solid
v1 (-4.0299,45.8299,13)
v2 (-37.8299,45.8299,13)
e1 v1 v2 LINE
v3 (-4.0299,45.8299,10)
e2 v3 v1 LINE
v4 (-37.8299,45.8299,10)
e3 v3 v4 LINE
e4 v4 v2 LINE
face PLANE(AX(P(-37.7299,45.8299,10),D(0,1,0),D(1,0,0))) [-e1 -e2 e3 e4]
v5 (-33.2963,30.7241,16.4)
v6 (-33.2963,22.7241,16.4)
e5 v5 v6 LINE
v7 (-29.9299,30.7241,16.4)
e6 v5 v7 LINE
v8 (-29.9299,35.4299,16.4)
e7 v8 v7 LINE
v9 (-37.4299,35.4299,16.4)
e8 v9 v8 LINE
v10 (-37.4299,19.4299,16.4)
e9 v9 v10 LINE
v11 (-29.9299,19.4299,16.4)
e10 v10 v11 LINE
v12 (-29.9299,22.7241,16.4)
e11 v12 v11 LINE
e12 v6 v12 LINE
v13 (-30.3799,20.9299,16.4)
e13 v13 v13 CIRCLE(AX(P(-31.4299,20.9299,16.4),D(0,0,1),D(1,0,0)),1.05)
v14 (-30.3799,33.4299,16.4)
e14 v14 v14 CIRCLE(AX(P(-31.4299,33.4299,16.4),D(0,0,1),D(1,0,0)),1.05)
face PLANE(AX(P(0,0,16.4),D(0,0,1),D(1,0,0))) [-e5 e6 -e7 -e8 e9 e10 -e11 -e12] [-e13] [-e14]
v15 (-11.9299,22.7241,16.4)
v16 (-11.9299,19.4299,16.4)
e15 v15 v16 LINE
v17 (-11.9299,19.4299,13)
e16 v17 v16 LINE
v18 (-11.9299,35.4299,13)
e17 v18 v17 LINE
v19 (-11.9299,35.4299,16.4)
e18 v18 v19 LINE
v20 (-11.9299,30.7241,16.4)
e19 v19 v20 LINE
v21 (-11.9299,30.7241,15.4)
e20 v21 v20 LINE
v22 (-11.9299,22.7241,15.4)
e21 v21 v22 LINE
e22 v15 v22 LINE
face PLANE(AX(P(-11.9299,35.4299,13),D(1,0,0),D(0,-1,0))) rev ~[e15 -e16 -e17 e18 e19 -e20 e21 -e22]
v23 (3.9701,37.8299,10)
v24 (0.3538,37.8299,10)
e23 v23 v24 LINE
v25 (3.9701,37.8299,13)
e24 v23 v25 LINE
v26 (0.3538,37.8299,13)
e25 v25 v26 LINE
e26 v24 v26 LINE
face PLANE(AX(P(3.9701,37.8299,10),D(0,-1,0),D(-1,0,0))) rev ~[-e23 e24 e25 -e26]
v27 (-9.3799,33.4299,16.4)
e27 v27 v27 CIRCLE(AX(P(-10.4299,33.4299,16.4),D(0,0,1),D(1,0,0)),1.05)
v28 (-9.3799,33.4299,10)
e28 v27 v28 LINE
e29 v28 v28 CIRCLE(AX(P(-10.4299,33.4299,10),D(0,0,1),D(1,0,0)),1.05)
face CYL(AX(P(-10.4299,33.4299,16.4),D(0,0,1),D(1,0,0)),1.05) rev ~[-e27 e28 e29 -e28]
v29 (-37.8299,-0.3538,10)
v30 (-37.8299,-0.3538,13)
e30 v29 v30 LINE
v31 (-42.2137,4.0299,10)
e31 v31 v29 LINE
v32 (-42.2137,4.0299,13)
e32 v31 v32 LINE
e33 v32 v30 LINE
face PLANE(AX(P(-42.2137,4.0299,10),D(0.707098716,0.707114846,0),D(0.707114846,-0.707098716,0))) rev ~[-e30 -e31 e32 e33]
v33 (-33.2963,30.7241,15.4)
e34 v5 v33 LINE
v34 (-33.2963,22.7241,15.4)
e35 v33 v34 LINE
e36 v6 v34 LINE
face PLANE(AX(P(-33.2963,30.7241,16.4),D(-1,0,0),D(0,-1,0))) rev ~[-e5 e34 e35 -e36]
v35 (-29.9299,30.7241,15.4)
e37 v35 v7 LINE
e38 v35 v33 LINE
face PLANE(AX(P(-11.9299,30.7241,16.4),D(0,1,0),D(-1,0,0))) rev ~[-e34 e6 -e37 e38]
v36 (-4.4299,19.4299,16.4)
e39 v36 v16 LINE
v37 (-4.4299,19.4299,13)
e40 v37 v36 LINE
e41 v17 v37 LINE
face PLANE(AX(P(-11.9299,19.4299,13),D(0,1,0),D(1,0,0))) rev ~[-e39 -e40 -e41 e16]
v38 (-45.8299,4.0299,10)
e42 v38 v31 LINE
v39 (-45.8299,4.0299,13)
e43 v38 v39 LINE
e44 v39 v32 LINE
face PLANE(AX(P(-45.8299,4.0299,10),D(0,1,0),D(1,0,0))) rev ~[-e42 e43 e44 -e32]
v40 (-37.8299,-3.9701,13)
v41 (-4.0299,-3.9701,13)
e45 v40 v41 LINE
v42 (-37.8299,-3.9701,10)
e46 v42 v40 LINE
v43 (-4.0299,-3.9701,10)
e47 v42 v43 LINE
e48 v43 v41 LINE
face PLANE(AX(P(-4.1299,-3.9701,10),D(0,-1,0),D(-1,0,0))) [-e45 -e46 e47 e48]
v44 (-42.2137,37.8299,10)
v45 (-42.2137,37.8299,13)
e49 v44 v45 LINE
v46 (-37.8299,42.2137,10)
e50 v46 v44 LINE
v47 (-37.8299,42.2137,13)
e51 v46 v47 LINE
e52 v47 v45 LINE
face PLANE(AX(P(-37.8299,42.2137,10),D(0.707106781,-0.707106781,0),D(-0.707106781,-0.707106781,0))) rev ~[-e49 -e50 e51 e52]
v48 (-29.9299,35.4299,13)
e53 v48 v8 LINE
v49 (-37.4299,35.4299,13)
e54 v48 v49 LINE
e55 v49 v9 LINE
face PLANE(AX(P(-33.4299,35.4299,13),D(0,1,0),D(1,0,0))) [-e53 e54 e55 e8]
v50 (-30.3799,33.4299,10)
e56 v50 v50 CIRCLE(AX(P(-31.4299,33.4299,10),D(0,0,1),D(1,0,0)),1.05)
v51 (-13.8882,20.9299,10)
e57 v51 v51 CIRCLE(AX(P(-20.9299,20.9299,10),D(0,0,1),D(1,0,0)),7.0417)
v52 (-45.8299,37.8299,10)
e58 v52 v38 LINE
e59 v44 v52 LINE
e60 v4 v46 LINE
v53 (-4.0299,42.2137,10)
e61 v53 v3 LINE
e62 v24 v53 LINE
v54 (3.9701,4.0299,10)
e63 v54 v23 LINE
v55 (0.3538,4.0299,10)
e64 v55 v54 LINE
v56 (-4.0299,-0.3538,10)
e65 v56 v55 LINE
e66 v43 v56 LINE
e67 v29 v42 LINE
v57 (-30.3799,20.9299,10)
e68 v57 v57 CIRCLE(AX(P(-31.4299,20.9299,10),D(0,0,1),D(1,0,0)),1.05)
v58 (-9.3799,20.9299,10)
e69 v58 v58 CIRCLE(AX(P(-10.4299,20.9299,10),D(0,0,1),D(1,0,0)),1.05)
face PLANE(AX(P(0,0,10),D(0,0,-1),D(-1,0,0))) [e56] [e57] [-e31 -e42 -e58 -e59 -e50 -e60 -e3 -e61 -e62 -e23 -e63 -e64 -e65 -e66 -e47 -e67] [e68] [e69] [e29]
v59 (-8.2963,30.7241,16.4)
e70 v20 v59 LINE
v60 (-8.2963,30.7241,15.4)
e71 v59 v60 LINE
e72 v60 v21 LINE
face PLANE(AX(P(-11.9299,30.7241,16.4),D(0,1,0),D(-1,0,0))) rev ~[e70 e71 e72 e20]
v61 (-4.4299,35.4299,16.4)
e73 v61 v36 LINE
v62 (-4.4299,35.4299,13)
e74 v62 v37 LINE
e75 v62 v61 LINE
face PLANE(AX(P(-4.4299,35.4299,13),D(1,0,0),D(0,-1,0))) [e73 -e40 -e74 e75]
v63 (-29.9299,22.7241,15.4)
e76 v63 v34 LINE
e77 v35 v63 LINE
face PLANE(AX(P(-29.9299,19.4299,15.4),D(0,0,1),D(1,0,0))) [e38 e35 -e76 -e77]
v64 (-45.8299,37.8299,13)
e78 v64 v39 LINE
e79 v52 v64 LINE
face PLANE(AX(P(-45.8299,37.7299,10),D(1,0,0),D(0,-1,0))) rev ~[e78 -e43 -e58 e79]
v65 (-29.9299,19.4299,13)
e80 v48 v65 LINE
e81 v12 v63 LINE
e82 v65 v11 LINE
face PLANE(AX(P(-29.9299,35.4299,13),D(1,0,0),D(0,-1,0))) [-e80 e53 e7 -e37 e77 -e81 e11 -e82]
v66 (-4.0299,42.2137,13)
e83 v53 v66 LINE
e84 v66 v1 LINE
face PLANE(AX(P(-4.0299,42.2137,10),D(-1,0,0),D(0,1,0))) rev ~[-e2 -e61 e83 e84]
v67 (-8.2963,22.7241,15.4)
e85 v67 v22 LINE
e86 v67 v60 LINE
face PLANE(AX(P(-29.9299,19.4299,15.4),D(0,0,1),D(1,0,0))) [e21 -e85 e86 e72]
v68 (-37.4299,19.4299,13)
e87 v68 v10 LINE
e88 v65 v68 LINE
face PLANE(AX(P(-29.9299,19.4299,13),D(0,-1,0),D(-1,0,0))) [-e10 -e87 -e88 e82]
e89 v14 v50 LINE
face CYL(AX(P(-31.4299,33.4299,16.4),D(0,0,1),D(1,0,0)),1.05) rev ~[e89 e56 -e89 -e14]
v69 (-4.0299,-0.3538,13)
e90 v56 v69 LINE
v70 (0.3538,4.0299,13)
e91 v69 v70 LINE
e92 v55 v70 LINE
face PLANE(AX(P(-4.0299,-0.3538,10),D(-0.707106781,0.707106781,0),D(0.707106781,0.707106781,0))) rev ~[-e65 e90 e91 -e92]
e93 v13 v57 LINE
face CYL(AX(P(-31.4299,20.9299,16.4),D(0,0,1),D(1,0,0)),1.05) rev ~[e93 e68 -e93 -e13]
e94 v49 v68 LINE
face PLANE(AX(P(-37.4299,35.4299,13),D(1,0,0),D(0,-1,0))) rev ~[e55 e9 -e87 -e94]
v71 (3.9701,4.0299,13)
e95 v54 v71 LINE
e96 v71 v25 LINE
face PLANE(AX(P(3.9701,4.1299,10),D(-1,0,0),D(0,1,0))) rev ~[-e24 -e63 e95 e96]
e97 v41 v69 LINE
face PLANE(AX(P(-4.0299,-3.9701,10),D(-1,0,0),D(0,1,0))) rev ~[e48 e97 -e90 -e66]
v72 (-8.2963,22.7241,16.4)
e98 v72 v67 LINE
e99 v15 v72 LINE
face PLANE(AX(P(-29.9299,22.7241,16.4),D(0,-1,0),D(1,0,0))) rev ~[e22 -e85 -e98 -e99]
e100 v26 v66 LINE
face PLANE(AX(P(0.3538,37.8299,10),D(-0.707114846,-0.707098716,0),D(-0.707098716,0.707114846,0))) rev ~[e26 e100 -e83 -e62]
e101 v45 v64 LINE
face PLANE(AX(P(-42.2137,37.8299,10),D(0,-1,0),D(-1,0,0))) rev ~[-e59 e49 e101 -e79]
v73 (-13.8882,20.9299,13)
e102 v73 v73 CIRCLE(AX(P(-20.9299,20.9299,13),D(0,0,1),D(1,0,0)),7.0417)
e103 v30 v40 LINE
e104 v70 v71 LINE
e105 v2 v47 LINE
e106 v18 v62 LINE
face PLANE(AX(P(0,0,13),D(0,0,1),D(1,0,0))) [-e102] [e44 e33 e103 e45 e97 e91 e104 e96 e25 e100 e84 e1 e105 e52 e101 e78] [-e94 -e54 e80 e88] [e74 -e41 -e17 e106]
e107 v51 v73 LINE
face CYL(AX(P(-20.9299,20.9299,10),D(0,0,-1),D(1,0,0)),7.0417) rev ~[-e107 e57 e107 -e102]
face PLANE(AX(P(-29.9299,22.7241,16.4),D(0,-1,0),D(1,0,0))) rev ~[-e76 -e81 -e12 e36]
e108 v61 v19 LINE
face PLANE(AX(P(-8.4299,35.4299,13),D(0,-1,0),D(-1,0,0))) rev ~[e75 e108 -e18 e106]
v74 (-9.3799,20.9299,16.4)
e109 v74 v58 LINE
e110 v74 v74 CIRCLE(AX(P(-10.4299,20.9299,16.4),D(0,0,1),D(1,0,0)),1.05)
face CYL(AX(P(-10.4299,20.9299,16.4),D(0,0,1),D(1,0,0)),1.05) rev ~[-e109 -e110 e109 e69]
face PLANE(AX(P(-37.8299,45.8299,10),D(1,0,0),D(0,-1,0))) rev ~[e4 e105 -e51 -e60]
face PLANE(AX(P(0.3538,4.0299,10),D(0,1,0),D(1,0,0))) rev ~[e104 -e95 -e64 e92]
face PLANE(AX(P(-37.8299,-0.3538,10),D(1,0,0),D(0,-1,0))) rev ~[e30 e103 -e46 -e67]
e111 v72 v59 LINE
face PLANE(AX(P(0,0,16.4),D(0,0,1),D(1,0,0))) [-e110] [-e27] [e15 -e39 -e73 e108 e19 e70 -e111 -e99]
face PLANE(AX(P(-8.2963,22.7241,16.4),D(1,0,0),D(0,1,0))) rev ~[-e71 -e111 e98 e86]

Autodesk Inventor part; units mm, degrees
ref_plane "YZ Plane" through (0, 0, 0) normal (1, 0, 0) x (0, 1, 0)
ref_plane "Work Plane1" through (0, 0, 10) normal (0, 0, 1) x (1, 0, 0)
sketch "Sketch1" plane through (0, 0, 10) normal (0, 0, 1) x (1, 0, 0)
  line L0 (-4.0299, -0.3538) -> (-2.2322, 1.4439) construction
  arc A0 (-1.4439, 2.2322) -> (-2.2322, 1.4439) centre (-0.9299, 0.9299) ccw construction
  line L1 (-1.4439, 2.2322) -> (0.3538, 4.0299) construction
  line L2 (-37.8299, 42.2137) -> (-37.8299, 45.8299) construction
  line L3 (-37.8299, 45.8299) -> (-4.0299, 45.8299) construction
  line L4 (-4.0299, 45.8299) -> (-4.0299, 42.2137) construction
  line L5 (-4.0299, 4.0299) -> (0.3538, 4.0299) projected
  circle A1 centre (-20.9299, 20.9299) radius 17.5 projected
  line L6 (-20.9299, 58.9723) -> (17.1124, 20.9299) construction
  line L7 (17.1124, 20.9299) -> (-20.9299, -17.1124) construction
  line L8 (-20.9299, -17.1124) -> (-58.9723, 20.9299) construction
  line L9 (-58.9723, 20.9299) -> (-20.9299, 58.9723) construction
  line L10 (-20.9299, 58.9723) -> (-20.9299, -17.1124) construction
  line L11 (17.1124, 20.9299) -> (-58.9723, 20.9299) construction
  line L12 (-20.9299, 58.9723) -> (32.8701, 58.9723) construction
  line L13 (-43.4299, 43.4299) -> (1.5701, 43.4299) construction
  line L14 (1.5701, 43.4299) -> (1.5701, -1.5701) construction
  line L15 (1.5701, -1.5701) -> (-43.4299, -1.5701) construction
  line L16 (-43.4299, -1.5701) -> (-43.4299, 43.4299) construction
  line L17 (-43.4299, 43.4299) -> (1.5701, -1.5701) construction
  line L18 (1.5701, 43.4299) -> (-43.4299, -1.5701) construction
  line L19 (-43.4299, 5.3876) -> (-43.4299, 36.4723)
  line L20 (-43.4299, 36.4723) -> (-36.4723, 43.4299)
  line L21 (-36.4723, 43.4299) -> (-5.3876, 43.4299)
  line L22 (-5.3876, 43.4299) -> (1.5701, 36.4723)
  line L23 (1.5701, 36.4723) -> (1.5701, 5.3876)
  line L24 (1.5701, 5.3876) -> (-5.3876, -1.5701)
  line L25 (-5.3876, -1.5701) -> (-36.4723, -1.5701)
  line L26 (-36.4723, -1.5701) -> (-43.4299, 5.3876)
  line L27 (-4.0299, 42.2137) -> (-37.8299, 42.2137) projected
  line L28 (-4.0299, -0.3538) -> (-4.0299, 4.0299) projected
  circle A2 centre (-20.9299, 20.9299) radius 7.0417
  point P0 (-37.8299, 4.0299)
  dimension "d18" = 53.8
  dimension "d19" = 45
  dimension "d20" = 53.8
  dimension "d21" = 45
  dimension "d22" = 45
extrude "Extrusion1" add sketch "Sketch1" along normal blind 3 contours L28 L24 L25 L26 L19 L20 L27 L22 L23 L5 | L5 L24 L28 | L27 L20 L21 L22 | A1
sketch "Sketch3" plane through (0, 0, 10) normal (0, 0, -1) x (-1, 0, 0)
  line L0 (37.8299, -0.4701) -> (37.8299, 4.0299) construction
  line L1 (4.0299, 4.0299) -> (4.0299, -0.4701) construction
  line L2 (37.8299, -0.4701) -> (37.8299, 1.1886) construction
  line L3 (4.0299, -3.9701) -> (4.0299, -0.3538) construction
  line L4 (45.8299, 4.0299) -> (42.2137, 4.0299) construction
  line L5 (-0.3538, 4.0299) -> (-3.9701, 4.0299) construction
  line L6 (-3.9701, 37.8299) -> (-0.3538, 37.8299) construction
  line L7 (4.0299, 42.2137) -> (4.0299, 45.8299) construction
  line L8 (37.8299, 45.8299) -> (37.8299, 42.2137) construction
  line L9 (42.2137, 37.8299) -> (45.8299, 37.8299) construction
  line L10 (37.8299, 37.7299) -> (45.8299, 37.7299)
  line L11 (45.8299, 37.7299) -> (45.8299, 4.1299)
  line L12 (45.8299, 4.1299) -> (37.8299, 4.1299)
  line L13 (37.8299, 4.1299) -> (37.8299, 37.7299)
  line L14 (37.7299, 4.0299) -> (4.1299, 4.0299)
  line L15 (4.1299, 4.0299) -> (4.1299, -3.9701)
  line L16 (4.1299, -3.9701) -> (37.7299, -3.9701)
  line L17 (37.7299, -3.9701) -> (37.7299, 4.0299)
  line L18 (4.0299, 4.1299) -> (-3.9701, 4.1299)
  line L19 (-3.9701, 4.1299) -> (-3.9701, 37.7299)
  line L20 (-3.9701, 37.7299) -> (4.0299, 37.7299)
  line L21 (4.0299, 37.7299) -> (4.0299, 4.1299)
  line L22 (4.1299, 37.8299) -> (37.7299, 37.8299)
  line L23 (37.7299, 37.8299) -> (37.7299, 45.8299)
  line L24 (37.7299, 45.8299) -> (4.1299, 45.8299)
  line L25 (4.1299, 45.8299) -> (4.1299, 37.8299)
  point P0 (0, 0)
  dimension "d23" = 0.1
  dimension "d24" = 0.1
  dimension "d25" = 0.1
  dimension "d26" = 0.1
  dimension "d27" = 0.1
extrude "Extrusion3" add sketch "Sketch3" against normal up to surface (3 mm away)
sketch "Sketch4" plane through (0, 0, 13) normal (0, 0, 1) x (1, 0, 0)
  line L0 (-33.4299, 35.4299) -> (-33.4299, 11.4299) construction
  line L1 (-33.4299, 11.4299) -> (-8.4299, 11.4299) construction
  line L2 (-8.4299, 11.4299) -> (-8.4299, 35.4299) construction
  line L3 (-8.4299, 35.4299) -> (-33.4299, 35.4299) construction
  circle A0 centre (-10.4299, 33.4299) radius 1.05 construction
  circle A1 centre (-10.4299, 20.9299) radius 1.05 construction
  circle A2 centre (-31.4299, 20.9299) radius 1.05 construction
  circle A3 centre (-31.4299, 33.4299) radius 1.05 construction
  line L4 (-15.4299, 29.8299) -> (-12.4299, 29.8299) construction
  line L5 (-15.4299, 31.8299) -> (-15.4299, 29.8299) construction
  line L6 (-12.4299, 31.8299) -> (-15.4299, 31.8299) construction
  line L7 (-12.4299, 29.8299) -> (-12.4299, 31.8299) construction
  line L8 (-8.4299, 35.4299) -> (-11.9299, 35.4299)
  line L9 (-11.9299, 35.4299) -> (-11.9299, 19.4299)
  line L10 (-11.9299, 19.4299) -> (-8.4299, 19.4299)
  line L11 (-8.4299, 19.4299) -> (-8.4299, 35.4299)
  line L12 (-33.4299, 35.4299) -> (-29.9299, 35.4299)
  line L13 (-29.9299, 35.4299) -> (-29.9299, 19.4299)
  line L14 (-29.9299, 19.4299) -> (-33.4299, 19.4299)
  line L15 (-33.4299, 19.4299) -> (-33.4299, 35.4299)
  line L16 (-33.4299, 35.4299) -> (-37.4299, 35.4299)
  line L17 (-37.4299, 35.4299) -> (-37.4299, 19.4299)
  line L18 (-37.4299, 19.4299) -> (-33.4299, 19.4299)
  line L19 (-33.4299, 19.4299) -> (-33.4299, 35.4299)
  line L20 (-8.4299, 35.4299) -> (-4.4299, 35.4299)
  line L21 (-4.4299, 35.4299) -> (-4.4299, 19.4299)
  line L22 (-4.4299, 19.4299) -> (-8.4299, 19.4299)
  line L23 (-8.4299, 19.4299) -> (-8.4299, 35.4299)
  point P0 (0, 0)
  dimension "d30" = 3.5
  dimension "d31" = 16
  dimension "d32" = 3.5
  dimension "d37" = 4
  dimension "d38" = 4
ref_plane "Work Plane3" through (-33.4299, 11.4299, 16.4) normal (0, 0, -1) x (0, 1, 0)
extrude "Extrusion4" add sketch "Sketch4" along normal up to surface (3.4 mm away)
sketch "Sketch5" plane through (-11.9299, 35.4299, 16.4) normal (0, 0, 1) x (1, 0, 0)
  circle A0 centre (1.5, -14.5) radius 1.05 projected
  circle A1 centre (1.5, -2) radius 1.05 projected
  circle A2 centre (-19.5, -2) radius 1.05 projected
  circle A3 centre (-19.5, -14.5) radius 1.05 projected
  point P0 (11.9299, -35.4299)
extrude "Extrusion5" cut sketch "Sketch5" against normal through all
sketch "Sketch7" plane through (-37.4299, 35.4299, 13) normal (0, 1, 0) x (1, 0, 0)
  line L0 (4.95, -3.4) -> (4.95, 3) projected
  line L1 (7.5, -3.4) -> (0, -3.4) projected
  line L2 (7.5, 0) -> (7.5, -3.4) projected
  line L3 (0, 0) -> (7.5, 0) projected
  line L4 (0, 0) -> (0, -3.4) projected
  line L5 (33, -3.4) -> (25.5, -3.4) projected
  line L6 (33, 0) -> (33, -3.4) projected
  line L7 (25.5, 0) -> (33, 0) projected
  line L8 (25.5, 0) -> (25.5, -3.4) projected
  line L9 (0, -3.4) -> (7.5, -3.4) projected
  line L10 (0, -3.4) -> (3, -3.4)
  line L11 (3, -3.4) -> (3, -13.4)
  line L12 (3, -13.4) -> (0, -13.4)
  line L13 (0, -13.4) -> (0, -3.4)
  line L14 (33, -3.4) -> (30, -3.4)
  line L15 (30, -3.4) -> (30, -13.4)
  line L16 (30, -13.4) -> (33, -13.4)
  line L17 (33, -13.4) -> (33, -3.4)
  line L18 (0, -13.4) -> (7, -13.4)
  line L19 (7, -13.4) -> (7, -15.4)
  line L20 (7, -15.4) -> (0, -15.4)
  line L21 (0, -15.4) -> (0, -13.4)
  line L22 (33, -13.4) -> (26, -13.4)
  line L23 (26, -13.4) -> (26, -15.4)
  line L24 (26, -15.4) -> (33, -15.4)
  line L25 (33, -15.4) -> (33, -13.4)
  line L26 (3, -12) -> (5, -12)
  line L27 (5, -12) -> (5, -10)
  line L28 (5, -10) -> (3, -10)
  line L29 (3, -10) -> (3, -12)
  line L30 (30, -12) -> (28, -12)
  line L31 (28, -12) -> (28, -10)
  line L32 (28, -10) -> (30, -10)
  line L33 (30, -10) -> (30, -12)
  line L34 (5, -10) -> (3, -8)
  line L35 (5, -10) -> (7.8284, -10) construction
  line L36 (28, -10) -> (30, -8)
  line L37 (0, -15.4) -> (-2.7154, 0)
  line L38 (-4.7423, 0) -> (-0.3, 0) projected
  line L39 (0, -15.4) -> (15.6376, -15.4) construction
  line L40 (-2.7154, 0) -> (0, 0)
  line L41 (0, -15.4) -> (0, 0)
  line L42 (33, -15.4) -> (35.7154, 0)
  line L43 (33, -15.4) -> (48.6376, -15.4) construction
  line L44 (35.7154, 0) -> (33, 0)
  line L45 (37.7423, 0) -> (33.3, 0) projected
  line L46 (33, -15.4) -> (33, 0)
  point P0 (37.4299, 13)
  dimension "d39" = 3
  dimension "d40" = 10
  dimension "d41" = 3
  dimension "d42" = 7
  dimension "d43" = 2
  dimension "d44" = 7
  dimension "d47" = 27
  dimension "d48" = 1.4
  dimension "d49" = 2
  dimension "d50" = 2
  dimension "d51" = 2
  dimension "d52" = 135
  dimension "d53" = 100
  dimension "d54" = 80
extrude "Extrusion6" [suppressed]
sketch "Sketch8" plane through (-29.9299, 35.4299, 16.4) normal (0, 1, 0) x (1, 0, 0)
  line L0 (0, 0) -> (-7.5, 0) projected
  line L1 (0, 3.4) -> (0, 0) projected
  line L2 (-7.5, 3.4) -> (0, 3.4) projected
  line L3 (18, 3.4) -> (25.5, 3.4) projected
  line L4 (18, 3.4) -> (18, 0) projected
  line L5 (25.5, 0) -> (18, 0) projected
  line L6 (25.5, 3.4) -> (25.5, 0) projected
  line L7 (-7.5, 3.4) -> (-7.5, 0) projected
  point P0 (29.9299, 16.4)
extrude "Extrusion7" [suppressed]
sketch "Sketch9" plane through (-37.7299, 45.8299, 13) normal (0, 0, -1) x (-1, 0, 0)
  line L0 (0, -3.6577) -> (2.4154, -6.0731) projected
  line L1 (2.4154, -6.0731) -> (2.4154, 0) projected
  line L2 (2.4154, 0) -> (0, 0) projected
  line L3 (0, -3.6577) -> (0, 0) projected
  line L4 (-33.6, 0) -> (-33.6, -3.6577) projected
  line L5 (-33.6, 0) -> (-36.0154, 0) projected
  line L6 (-36.0154, -6.0731) -> (-36.0154, 0) projected
  line L7 (-36.0154, -6.0731) -> (-33.6, -3.6577) projected
  point P0 (-37.7299, -45.8299)
extrude "Extrusion8" [suppressed]
sketch "Sketch10" plane through (-29.9299, 19.4299, 16.4) normal (0, 0, 1) x (1, 0, 0)
  line L0 (0, 16) -> (0, 0) projected
  line L1 (18, 0) -> (18, 16) projected
  line L2 (-3.3664, 3.2942) -> (21.6336, 3.2942)
  line L3 (21.6336, 3.2942) -> (21.6336, 11.2942)
  line L4 (21.6336, 11.2942) -> (-3.3664, 11.2942)
  line L5 (-3.3664, 11.2942) -> (-3.3664, 3.2942)
  line L6 (-3.3664, 3.2942) -> (21.6336, 11.2942) construction
  line L7 (21.6336, 3.2942) -> (-3.3664, 11.2942) construction
  point P0 (29.9299, -19.4299)
  point P1 (0, 26.4)
  point P2 (18, 26.4)
  point P3 (9.1336, 7.2942)
  dimension "d59" = 25
  dimension "d60" = 8
extrude "Extrusion9" cut sketch "Sketch10" against normal blind 1
sketch "Sketch11" plane through (-37.4299, 19.4299, 28.4) normal (0, 0, 1) x (1, 0, 0)
  line L0 (0, 0) -> (7, 0) projected
  line L1 (7, 0) -> (7, 26.4) projected
  line L2 (7, 26.4) -> (0, 26.4) projected
  line L3 (0, 26.4) -> (0, 0) projected
  line L4 (26, 0) -> (33, 0) projected
  line L5 (33, 0) -> (33, 26.4) projected
  line L6 (33, 26.4) -> (26, 26.4) projected
  line L7 (26, 0) -> (26, 26.4) projected
  circle A0 centre (16.5, 1.5) radius 7.0417 projected
  circle A1 centre (6, 1.5) radius 1.05 construction
  circle A2 centre (6, 14) radius 1.05 construction
  line L8 (27, 1.5) -> (6, 1.5) construction
  line L9 (27, 4.6642) -> (6, 4.6642)
  line L10 (6, -1.6642) -> (27, -1.6642)
  arc A3 (27, -1.6642) -> (27, 4.6642) centre (27, 1.5) ccw
  arc A4 (6, 4.6642) -> (6, -1.6642) centre (6, 1.5) ccw
  line L11 (27, 14) -> (6, 14) construction
  line L12 (27, 17.1642) -> (6, 17.1642)
  line L13 (6, 10.8358) -> (27, 10.8358)
  arc A5 (27, 10.8358) -> (27, 17.1642) centre (27, 14) ccw
  arc A6 (6, 17.1642) -> (6, 10.8358) centre (6, 14) ccw
  point P0 (37.4299, -19.4299)
  point P1 (16.5, 14)
extrude "Extrusion10" [suppressed]
sketch "Skizze12" plane through (0, 0, 10) normal (0, 0, -1) x (-1, 0, 0)
  circle A0 centre (31.4299, 33.4299) radius 1.05 construction
  circle A1 centre (10.4299, 20.9299) radius 1.05 construction
  circle A2 centre (10.4299, 33.4299) radius 1.05 construction
  circle A3 centre (31.4299, 20.9299) radius 1.05 construction
  line L0 (-0.3124, 4.1299) -> (4.1299, -0.3124) projected
  line L1 (4.1299, -0.3124) -> (4.1299, -3.9701) projected
  line L2 (4.1299, -3.9701) -> (37.7299, -3.9701) construction
  line L3 (37.7299, -3.9701) -> (37.7299, -0.3124) projected
  line L4 (37.7299, -0.3124) -> (42.1723, 4.1299) projected
  line L5 (45.8299, 4.1299) -> (42.1723, 4.1299) projected
  line L6 (45.8299, 37.7299) -> (45.8299, 4.1299) construction
  line L7 (42.1723, 37.7299) -> (45.8299, 37.7299) projected
  line L8 (42.1723, 37.7299) -> (37.7299, 42.1723) projected
  line L9 (37.7299, 42.1723) -> (37.7299, 45.8299) projected
  line L10 (37.7299, 45.8299) -> (4.1299, 45.8299) construction
  line L11 (4.1299, 45.8299) -> (4.1299, 42.1723) projected
  line L12 (4.1299, 42.1723) -> (-0.3124, 37.7299) projected
  line L13 (-3.9701, 37.7299) -> (-0.3124, 37.7299) projected
  line L14 (-3.9701, 4.1299) -> (-3.9701, 37.7299) construction
  line L15 (-0.3124, 4.1299) -> (-3.9701, 4.1299) projected
  circle A4 centre (20.9299, 20.9299) radius 7.0417 construction
  line L16 (37.8299, -4.0701) -> (4.0299, -4.0701) construction
  line L17 (4.0299, -4.0701) -> (4.0299, -0.3538)
  line L18 (4.0299, -0.3538) -> (-0.3538, 4.0299)
  line L19 (-0.3538, 4.0299) -> (-4.0701, 4.0299)
  line L20 (-4.0701, 4.0299) -> (-4.0701, 37.8299) construction
  line L21 (-4.0701, 37.8299) -> (-0.3538, 37.8299)
  line L22 (-0.3538, 37.8299) -> (4.0299, 42.2137)
  line L23 (4.0299, 42.2137) -> (4.0299, 45.9299)
  line L24 (4.0299, 45.9299) -> (37.8299, 45.9299) construction
  line L25 (37.8299, 45.9299) -> (37.8299, 42.2137)
  line L26 (37.8299, 42.2137) -> (42.2137, 37.8299)
  line L27 (42.2137, 37.8299) -> (45.9299, 37.8299)
  line L28 (45.9299, 37.8299) -> (45.9299, 4.0299) construction
  line L29 (45.9299, 4.0299) -> (42.2137, 4.0299)
  line L30 (42.2137, 4.0299) -> (37.8299, -0.3538)
  line L31 (37.8299, -0.3538) -> (37.8299, -4.0701)
  line L32 (-3.9701, 37.7299) -> (-3.9701, 37.8299)
  line L33 (37.7299, 45.8299) -> (4.1299, 45.8299) projected
  line L34 (4.1299, 45.8299) -> (4.0299, 45.8299)
  line L35 (37.7299, 45.8299) -> (37.8299, 45.8299)
  line L36 (45.8299, 37.7299) -> (45.8299, 37.8299)
  line L37 (45.8299, 4.1299) -> (45.8299, 4.0299)
  line L38 (37.7299, -3.9701) -> (37.8299, -3.9701)
  line L39 (4.1299, -3.9701) -> (4.0299, -3.9701)
  line L40 (-3.9701, 4.1299) -> (-3.9701, 4.0299)
  point P0 (0, 0)
  dimension "d18" = 53.8
  dimension "d19" = 45
  dimension "d20" = 53.8
  dimension "d21" = 45
  dimension "d22" = 45
  dimension "d65" = 0.1
extrude "IM_offset" add sketch "Skizze12" against normal up to surface (3 mm away)
properties part number "20_Cube_Insert_RaspiCam_v3"
